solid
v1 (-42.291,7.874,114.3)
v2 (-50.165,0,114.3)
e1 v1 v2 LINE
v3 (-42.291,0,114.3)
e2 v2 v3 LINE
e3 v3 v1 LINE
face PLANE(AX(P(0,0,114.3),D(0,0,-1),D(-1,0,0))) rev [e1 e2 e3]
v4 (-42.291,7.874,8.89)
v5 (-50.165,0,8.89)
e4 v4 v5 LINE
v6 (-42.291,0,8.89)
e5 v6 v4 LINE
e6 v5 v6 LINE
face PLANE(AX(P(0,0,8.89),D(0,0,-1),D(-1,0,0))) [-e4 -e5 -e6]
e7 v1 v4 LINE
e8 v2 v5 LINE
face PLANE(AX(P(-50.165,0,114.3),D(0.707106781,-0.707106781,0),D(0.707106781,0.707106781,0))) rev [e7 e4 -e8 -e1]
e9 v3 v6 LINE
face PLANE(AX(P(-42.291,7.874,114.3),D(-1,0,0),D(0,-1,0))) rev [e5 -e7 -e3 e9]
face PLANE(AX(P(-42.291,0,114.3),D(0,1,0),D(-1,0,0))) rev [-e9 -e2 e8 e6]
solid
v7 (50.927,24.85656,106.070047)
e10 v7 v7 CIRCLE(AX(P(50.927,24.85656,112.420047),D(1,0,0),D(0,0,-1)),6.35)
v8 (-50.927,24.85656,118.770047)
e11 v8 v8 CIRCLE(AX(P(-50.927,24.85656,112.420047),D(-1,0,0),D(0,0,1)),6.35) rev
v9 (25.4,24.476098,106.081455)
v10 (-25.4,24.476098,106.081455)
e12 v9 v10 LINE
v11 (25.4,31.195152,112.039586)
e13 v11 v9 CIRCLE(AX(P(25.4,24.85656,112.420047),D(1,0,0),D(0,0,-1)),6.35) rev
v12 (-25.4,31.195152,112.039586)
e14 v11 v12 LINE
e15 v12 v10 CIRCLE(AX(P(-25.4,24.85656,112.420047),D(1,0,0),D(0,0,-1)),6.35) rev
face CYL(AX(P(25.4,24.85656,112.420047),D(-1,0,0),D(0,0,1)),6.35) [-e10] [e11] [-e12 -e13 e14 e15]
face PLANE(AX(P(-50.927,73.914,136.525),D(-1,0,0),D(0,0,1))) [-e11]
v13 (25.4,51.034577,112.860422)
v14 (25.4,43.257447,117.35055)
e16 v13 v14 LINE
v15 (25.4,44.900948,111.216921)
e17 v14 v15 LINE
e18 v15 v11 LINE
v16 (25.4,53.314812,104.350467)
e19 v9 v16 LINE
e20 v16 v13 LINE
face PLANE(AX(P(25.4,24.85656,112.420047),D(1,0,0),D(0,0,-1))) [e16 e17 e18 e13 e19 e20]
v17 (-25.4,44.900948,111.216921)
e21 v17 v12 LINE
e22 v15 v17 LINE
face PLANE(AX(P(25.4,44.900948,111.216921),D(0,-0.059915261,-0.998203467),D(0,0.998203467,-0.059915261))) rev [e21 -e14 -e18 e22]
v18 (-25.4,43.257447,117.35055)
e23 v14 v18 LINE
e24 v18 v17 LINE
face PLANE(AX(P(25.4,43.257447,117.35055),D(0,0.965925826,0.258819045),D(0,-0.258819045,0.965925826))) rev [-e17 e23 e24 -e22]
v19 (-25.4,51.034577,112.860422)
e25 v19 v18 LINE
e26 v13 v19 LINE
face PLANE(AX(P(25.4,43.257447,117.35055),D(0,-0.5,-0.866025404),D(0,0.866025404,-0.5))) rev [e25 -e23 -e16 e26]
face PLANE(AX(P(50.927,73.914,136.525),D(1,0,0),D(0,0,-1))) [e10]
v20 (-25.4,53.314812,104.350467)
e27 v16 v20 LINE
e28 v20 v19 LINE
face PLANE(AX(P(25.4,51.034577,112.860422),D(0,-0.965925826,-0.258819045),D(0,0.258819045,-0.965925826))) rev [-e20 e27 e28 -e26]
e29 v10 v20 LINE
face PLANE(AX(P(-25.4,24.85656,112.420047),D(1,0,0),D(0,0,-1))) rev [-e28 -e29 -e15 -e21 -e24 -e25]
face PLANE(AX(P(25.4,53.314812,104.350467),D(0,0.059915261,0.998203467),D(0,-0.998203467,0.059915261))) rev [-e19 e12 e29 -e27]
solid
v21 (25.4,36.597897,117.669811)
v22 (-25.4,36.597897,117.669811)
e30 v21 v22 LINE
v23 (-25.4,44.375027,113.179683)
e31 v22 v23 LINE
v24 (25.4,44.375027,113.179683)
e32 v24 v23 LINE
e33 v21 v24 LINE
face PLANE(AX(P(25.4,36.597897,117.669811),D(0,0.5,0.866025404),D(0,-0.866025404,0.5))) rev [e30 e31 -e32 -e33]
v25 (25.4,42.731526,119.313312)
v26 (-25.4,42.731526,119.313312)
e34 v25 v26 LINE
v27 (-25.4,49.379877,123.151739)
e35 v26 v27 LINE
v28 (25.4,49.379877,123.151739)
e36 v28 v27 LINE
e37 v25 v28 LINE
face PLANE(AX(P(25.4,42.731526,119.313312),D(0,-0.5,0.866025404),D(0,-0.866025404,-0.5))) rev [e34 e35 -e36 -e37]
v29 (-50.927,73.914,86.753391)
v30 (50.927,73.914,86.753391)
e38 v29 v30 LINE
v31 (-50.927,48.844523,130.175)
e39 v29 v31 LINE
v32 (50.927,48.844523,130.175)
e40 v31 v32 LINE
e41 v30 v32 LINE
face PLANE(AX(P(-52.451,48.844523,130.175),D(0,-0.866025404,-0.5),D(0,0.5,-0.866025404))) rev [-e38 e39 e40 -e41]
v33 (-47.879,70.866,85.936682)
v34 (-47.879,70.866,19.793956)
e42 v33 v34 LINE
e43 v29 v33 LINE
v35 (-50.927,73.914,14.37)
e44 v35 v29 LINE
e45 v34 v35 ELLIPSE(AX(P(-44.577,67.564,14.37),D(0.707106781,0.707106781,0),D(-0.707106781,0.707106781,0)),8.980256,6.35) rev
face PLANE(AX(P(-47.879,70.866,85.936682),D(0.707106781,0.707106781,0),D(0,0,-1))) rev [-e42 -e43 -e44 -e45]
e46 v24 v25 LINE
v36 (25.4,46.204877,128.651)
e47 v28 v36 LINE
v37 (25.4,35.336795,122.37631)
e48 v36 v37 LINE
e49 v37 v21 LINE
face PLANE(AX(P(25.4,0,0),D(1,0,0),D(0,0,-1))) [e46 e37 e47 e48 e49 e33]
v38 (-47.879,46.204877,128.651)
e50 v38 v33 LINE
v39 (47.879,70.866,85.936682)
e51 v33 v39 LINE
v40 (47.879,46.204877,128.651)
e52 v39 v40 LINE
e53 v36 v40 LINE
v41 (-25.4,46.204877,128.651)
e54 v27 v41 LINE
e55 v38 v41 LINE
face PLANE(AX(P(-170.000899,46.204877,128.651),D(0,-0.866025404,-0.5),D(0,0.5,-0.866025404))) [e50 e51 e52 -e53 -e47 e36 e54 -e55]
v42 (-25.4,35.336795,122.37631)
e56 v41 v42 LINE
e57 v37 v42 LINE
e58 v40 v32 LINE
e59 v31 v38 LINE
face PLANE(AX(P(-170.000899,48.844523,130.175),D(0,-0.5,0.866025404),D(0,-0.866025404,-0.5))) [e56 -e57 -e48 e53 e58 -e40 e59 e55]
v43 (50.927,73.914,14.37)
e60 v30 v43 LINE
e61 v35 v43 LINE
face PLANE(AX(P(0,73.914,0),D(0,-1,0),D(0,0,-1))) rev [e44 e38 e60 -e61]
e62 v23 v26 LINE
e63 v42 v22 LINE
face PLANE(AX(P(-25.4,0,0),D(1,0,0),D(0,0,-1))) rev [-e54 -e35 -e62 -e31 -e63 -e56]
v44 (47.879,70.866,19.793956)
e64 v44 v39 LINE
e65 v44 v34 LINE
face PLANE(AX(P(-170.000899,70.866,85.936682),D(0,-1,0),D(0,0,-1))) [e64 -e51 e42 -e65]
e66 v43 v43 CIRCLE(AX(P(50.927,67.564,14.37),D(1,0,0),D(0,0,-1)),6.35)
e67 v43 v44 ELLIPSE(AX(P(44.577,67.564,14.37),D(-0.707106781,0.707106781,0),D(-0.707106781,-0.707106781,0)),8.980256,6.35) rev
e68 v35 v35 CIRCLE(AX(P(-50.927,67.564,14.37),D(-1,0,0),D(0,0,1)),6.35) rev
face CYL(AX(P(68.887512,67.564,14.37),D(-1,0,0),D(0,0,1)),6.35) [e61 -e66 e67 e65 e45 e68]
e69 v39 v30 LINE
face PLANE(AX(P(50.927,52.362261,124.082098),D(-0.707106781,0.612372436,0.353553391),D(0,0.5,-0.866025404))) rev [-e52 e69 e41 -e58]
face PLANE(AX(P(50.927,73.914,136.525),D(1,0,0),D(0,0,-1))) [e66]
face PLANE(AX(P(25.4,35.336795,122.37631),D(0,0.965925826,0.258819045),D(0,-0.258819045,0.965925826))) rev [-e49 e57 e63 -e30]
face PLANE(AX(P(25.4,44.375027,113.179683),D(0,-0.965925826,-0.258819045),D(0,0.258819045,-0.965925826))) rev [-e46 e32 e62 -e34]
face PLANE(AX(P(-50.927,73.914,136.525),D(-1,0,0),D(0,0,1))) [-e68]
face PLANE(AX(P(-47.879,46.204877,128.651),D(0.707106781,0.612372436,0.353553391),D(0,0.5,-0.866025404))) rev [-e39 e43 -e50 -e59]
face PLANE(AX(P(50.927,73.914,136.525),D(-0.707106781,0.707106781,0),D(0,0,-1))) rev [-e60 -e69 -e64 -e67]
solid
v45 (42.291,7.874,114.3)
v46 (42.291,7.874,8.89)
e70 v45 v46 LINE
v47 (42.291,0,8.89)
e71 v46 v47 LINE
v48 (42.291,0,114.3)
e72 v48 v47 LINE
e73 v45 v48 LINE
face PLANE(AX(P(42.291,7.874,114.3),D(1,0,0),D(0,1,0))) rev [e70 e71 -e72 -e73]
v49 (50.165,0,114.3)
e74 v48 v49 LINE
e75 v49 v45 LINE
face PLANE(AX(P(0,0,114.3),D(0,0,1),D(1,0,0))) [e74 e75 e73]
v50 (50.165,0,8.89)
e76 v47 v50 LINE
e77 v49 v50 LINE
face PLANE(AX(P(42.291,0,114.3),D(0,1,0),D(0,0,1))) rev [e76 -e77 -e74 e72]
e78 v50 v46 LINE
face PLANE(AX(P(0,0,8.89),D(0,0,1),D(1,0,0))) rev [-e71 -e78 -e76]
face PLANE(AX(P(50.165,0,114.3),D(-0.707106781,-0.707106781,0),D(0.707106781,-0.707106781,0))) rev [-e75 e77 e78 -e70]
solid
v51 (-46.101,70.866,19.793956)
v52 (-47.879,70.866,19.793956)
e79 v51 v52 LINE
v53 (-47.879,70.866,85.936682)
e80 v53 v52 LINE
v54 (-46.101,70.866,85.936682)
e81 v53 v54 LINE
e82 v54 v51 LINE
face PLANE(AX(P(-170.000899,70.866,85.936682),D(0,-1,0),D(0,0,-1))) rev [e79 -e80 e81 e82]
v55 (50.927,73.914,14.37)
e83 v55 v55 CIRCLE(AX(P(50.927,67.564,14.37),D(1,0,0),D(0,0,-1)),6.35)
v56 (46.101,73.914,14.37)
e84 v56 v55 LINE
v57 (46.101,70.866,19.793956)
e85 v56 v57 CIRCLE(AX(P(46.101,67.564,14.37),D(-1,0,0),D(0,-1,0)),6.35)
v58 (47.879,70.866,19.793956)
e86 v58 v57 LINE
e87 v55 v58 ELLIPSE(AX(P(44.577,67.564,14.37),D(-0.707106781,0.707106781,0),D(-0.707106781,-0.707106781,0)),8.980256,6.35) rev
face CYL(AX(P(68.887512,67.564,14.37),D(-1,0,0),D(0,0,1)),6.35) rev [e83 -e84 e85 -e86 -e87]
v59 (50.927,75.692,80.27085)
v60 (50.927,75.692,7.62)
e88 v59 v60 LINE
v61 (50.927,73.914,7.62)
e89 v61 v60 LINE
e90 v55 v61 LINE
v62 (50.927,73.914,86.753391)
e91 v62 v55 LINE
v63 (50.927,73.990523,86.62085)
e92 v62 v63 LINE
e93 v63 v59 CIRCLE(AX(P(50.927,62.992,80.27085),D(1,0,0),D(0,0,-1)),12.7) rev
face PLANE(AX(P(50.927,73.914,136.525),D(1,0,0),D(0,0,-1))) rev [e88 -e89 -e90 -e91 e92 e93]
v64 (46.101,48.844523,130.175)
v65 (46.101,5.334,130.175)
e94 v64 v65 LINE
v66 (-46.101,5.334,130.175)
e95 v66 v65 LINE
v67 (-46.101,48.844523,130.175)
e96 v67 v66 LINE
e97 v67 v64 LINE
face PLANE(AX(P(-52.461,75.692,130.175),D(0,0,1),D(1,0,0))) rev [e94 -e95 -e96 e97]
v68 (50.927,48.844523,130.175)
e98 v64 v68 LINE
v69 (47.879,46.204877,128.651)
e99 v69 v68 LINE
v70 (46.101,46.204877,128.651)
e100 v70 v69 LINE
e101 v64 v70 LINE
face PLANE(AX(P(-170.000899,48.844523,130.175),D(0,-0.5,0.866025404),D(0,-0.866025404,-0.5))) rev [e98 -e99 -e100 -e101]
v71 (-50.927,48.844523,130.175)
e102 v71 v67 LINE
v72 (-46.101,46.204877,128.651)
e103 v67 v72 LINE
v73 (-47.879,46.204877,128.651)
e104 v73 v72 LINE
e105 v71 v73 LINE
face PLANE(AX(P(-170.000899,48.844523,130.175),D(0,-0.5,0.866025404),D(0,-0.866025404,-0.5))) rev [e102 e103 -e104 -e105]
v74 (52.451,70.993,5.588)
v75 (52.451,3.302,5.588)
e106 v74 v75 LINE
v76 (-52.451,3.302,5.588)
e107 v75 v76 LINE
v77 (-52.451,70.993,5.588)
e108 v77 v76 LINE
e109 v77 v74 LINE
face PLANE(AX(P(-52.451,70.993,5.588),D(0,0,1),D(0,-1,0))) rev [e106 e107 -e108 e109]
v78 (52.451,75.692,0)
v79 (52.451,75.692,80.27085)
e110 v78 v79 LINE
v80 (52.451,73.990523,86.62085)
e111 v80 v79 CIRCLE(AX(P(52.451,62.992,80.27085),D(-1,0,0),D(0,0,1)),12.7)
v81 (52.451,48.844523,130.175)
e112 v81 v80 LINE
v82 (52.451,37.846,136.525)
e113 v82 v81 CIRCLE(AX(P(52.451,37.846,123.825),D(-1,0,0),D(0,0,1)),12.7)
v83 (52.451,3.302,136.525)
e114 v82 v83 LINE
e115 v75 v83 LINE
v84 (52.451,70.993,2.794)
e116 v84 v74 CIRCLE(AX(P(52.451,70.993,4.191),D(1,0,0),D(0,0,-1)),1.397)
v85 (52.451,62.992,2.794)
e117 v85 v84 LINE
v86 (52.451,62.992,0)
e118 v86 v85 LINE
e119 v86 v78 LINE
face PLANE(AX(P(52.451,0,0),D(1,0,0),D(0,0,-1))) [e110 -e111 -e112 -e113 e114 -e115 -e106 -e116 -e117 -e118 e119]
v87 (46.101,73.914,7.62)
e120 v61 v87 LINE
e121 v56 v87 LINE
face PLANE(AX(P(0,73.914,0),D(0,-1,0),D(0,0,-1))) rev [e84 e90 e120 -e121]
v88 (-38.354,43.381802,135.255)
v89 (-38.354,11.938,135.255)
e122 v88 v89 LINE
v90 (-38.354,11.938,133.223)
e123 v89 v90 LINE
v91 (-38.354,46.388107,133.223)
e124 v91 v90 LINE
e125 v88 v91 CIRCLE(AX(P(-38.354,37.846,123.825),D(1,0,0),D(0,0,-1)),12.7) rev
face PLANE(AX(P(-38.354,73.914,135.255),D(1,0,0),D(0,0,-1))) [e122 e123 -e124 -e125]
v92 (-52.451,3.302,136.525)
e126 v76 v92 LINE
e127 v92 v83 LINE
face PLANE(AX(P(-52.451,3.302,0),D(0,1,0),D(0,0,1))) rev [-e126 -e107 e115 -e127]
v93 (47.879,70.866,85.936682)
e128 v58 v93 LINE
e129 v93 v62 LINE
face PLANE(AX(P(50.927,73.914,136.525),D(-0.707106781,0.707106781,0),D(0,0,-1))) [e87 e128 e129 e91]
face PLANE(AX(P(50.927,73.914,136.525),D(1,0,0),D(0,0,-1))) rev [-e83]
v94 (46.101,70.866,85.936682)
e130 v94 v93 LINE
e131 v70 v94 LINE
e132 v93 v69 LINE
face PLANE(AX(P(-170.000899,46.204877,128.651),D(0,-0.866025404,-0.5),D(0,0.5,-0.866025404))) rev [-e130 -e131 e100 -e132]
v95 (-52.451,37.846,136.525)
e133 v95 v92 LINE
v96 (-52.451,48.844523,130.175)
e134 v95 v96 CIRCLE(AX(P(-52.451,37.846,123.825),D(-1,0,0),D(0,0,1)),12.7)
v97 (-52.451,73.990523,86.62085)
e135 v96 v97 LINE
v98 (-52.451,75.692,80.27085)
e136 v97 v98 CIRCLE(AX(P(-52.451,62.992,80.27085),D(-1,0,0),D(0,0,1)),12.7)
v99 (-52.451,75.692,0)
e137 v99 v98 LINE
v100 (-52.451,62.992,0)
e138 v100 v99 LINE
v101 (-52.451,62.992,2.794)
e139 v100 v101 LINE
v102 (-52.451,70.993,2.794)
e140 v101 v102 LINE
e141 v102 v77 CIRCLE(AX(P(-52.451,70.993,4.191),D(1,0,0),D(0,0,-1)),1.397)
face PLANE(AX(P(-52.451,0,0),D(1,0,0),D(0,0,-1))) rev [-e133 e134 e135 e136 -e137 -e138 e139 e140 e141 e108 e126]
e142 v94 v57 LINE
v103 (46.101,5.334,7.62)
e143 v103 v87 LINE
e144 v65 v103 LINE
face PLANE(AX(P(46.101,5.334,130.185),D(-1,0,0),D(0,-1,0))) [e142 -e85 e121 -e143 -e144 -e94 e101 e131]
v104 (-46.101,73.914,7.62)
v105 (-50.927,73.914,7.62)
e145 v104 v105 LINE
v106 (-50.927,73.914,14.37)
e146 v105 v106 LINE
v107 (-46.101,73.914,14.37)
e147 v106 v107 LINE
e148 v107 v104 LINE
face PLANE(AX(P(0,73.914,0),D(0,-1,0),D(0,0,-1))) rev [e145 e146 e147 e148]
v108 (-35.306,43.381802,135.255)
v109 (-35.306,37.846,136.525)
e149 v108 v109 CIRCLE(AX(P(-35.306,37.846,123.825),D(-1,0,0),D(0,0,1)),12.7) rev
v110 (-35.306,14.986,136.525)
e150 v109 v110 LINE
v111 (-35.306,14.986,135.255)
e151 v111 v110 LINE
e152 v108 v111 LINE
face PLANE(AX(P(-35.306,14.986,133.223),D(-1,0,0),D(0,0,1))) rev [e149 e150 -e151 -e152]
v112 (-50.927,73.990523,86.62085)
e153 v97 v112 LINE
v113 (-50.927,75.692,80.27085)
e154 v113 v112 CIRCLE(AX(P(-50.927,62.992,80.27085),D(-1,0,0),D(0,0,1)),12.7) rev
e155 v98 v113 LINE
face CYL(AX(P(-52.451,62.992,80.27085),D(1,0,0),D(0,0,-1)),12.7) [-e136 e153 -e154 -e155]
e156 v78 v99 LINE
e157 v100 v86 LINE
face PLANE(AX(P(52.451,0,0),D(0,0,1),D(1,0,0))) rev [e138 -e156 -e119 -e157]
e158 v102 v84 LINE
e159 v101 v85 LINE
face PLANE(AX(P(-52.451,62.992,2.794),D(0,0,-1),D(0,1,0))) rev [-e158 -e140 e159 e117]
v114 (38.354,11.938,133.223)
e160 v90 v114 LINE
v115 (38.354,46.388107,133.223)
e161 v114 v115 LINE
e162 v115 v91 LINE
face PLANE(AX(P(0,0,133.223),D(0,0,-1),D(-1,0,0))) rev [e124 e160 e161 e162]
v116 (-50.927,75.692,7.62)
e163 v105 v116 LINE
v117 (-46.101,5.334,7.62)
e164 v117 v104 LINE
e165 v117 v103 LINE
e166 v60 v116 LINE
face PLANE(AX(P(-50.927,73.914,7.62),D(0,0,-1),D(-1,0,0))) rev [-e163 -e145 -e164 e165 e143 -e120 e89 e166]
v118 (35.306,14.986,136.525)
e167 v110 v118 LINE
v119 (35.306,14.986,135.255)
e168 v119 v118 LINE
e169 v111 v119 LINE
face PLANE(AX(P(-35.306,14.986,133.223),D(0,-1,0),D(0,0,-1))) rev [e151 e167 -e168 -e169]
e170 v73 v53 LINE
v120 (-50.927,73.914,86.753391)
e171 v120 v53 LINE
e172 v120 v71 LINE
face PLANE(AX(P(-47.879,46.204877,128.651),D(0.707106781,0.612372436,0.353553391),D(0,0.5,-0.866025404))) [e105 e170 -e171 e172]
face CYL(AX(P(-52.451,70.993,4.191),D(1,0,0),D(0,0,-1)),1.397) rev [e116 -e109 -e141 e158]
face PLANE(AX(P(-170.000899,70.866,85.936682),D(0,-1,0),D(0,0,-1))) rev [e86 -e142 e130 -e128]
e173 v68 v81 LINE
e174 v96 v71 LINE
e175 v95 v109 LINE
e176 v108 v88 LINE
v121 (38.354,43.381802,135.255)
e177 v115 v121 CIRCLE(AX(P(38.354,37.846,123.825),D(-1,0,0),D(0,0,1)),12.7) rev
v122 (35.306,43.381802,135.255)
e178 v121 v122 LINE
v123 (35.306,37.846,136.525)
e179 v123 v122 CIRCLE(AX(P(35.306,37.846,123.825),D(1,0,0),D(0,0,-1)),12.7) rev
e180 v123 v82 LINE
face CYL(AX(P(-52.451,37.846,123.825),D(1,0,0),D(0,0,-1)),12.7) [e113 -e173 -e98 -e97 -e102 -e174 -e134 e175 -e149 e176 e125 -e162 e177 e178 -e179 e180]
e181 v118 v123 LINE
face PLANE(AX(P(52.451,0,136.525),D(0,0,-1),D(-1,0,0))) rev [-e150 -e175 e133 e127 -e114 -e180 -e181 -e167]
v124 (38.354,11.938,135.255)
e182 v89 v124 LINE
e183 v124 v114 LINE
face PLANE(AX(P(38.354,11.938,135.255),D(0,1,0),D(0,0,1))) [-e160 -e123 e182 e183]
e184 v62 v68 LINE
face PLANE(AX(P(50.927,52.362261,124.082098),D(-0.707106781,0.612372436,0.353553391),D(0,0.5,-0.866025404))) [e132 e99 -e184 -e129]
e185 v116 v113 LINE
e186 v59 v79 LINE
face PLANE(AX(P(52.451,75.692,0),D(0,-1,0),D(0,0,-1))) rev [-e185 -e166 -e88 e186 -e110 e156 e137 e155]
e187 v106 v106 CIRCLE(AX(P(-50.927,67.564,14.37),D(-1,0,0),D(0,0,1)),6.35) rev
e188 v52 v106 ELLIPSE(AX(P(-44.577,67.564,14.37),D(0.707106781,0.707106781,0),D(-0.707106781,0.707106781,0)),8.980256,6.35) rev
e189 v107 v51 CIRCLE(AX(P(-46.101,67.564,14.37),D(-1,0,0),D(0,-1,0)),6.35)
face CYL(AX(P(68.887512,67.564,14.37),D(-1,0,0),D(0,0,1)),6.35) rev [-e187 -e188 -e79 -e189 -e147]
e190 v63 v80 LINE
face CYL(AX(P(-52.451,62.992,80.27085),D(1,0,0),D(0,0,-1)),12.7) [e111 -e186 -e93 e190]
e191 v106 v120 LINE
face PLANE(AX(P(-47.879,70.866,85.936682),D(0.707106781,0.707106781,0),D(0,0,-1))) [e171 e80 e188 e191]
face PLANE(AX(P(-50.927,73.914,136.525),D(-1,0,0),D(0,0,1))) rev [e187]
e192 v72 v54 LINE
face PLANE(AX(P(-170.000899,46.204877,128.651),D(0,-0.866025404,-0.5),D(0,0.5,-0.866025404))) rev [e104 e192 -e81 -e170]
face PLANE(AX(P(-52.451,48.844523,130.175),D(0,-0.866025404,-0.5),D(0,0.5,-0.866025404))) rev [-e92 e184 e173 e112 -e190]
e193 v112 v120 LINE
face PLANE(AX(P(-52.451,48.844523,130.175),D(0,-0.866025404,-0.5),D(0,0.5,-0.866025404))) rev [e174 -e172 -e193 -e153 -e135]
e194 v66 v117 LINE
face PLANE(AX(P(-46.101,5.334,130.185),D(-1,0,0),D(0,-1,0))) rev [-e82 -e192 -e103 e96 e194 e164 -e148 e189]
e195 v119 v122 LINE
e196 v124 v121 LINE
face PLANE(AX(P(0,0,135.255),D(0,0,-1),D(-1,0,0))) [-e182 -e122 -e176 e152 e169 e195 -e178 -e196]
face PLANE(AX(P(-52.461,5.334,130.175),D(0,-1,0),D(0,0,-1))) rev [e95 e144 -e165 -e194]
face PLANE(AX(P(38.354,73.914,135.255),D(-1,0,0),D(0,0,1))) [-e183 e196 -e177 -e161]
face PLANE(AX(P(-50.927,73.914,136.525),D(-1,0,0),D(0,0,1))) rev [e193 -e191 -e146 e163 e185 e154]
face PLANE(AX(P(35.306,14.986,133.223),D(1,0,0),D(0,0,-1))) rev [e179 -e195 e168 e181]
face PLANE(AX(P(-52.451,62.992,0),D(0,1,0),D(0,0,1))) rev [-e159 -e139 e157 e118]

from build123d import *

# Parameters (mm, degrees)
SKETCH1_W                       = 136.525
SKETCH1_H                       = 75.692
BOSS_EXTRUDE1_DEPTH             = 52.451
CUT_EXTRUDE1_DEPTH              = 189.076537859
SKETCH3_W                       = 136.525
SKETCH3_H                       = 3.302
CUT_EXTRUDE2_DEPTH              = 189.076537859
BOSS_EXTRUDE2_START             = 8.89
BOSS_EXTRUDE2_DEPTH             = 105.41
BOSS_EXTRUDE2_2_DEPTH           = 105.41
SKETCH5_W                       = 101.854
SKETCH5_H                       = 128.905
CUT_EXTRUDE3_DEPTH              = 1.778
SKETCH6_W                       = 70.612
SKETCH6_H                       = 58.928
CUT_EXTRUDE4_DEPTH              = 3.302
SKETCH7_W                       = 76.708
SKETCH7_H                       = 61.976
CUT_EXTRUDE5_DEPTH              = 2.032
CUT_EXTRUDE6_DEPTH              = 189.076537859
SPLIT1_SURFACE_1_BACK           = 189.077
SPLIT1_SURFACE_1_DEPTH          = 378.154
SPLIT1_SURFACE_2_BACK           = 189.077
SPLIT1_SURFACE_2_DEPTH          = 378.154
BOSS_EXTRUDE3_REACH             = 166.68
SKETCH12_R                      = 6.35
BOSS_EXTRUDE3_DIRECTION_2_REACH = 166.68
BOSS_EXTRUDE4_DEPTH             = 101.854
CHAMFER1_SIZE                   = 3.048
INTERSECT1_START                = -88.312595624
INTERSECT1_DEPTH                = 106.603527134
INTERSECT1_START_2              = 14.369999962
INTERSECT1_2_DEPTH              = 114.281000039
INTERSECT1_START_3              = -50.927
INTERSECT1_3_OUTLINE_R          = 6.35
INTERSECT1_3_DEPTH              = 101.854
SPLIT4_START                    = -46.101
SPLIT4_DEPTH                    = 98.552
SPLIT4_START_2                  = 46.101
SPLIT4_2_DEPTH                  = 6.35
SPLIT4_START_3                  = 47.879
SPLIT4_3_DEPTH                  = 4.572
SPLIT4_START_4                  = 50.927
SPLIT4_4_OUTLINE_R              = 6.35
SPLIT4_4_DEPTH                  = 1.524
SPLIT4_START_5                  = -88.312595624
SPLIT4_5_DEPTH                  = 106.603527134
SPLIT4_START_6                  = 14.369999962
SPLIT4_6_DEPTH                  = 115.805000039
SPLIT4_START_7                  = 7
SPLIT4_7_OUTLINE_W              = 3.048
SPLIT4_7_OUTLINE_H              = 1.778
SPLIT4_7_DEPTH                  = 8.001344832
BOSS_EXTRUDE5_DEPTH             = 25.4
BOSS_EXTRUDE6_DEPTH             = 25.4
BOSS_EXTRUDE7_START             = -50.927
BOSS_EXTRUDE7_OUTLINE_R         = 6.35
BOSS_EXTRUDE7_DEPTH             = 101.854


with BuildPart() as part:
    # Sketch1 → Boss-Extrude1 (new, symmetric)
    with BuildSketch(Plane(origin=(0, 0, 0), x_dir=(0, 0, -1), z_dir=(1, 0, 0))):
        with Locations((-68.2625, 37.846)):
            Rectangle(SKETCH1_W, SKETCH1_H)
    extrude(amount=BOSS_EXTRUDE1_DEPTH, both=True)

    # Sketch2 → Cut-Extrude1 (cut, through all)
    with BuildSketch(Plane(origin=(52.451, 0, 0), x_dir=(0, 0, -1), z_dir=(1, 0, 0))):
        with BuildLine():
            Line((0, 0), (0, 62.992))
            Line((0, 62.992), (-2.794, 62.992))
            Line((-2.794, 62.992), (-2.794, 70.993))
            ThreePointArc((-2.794, 70.993), (-4.191, 72.39), (-5.588, 70.993))
            Line((-5.588, 70.993), (-5.588, 0))
            Line((-5.588, 0), (0, 0))
        make_face()
    extrude(amount=-CUT_EXTRUDE1_DEPTH, mode=Mode.SUBTRACT)

    # Sketch3 → Cut-Extrude2 (cut, through all)
    with BuildSketch(Plane(origin=(52.451, 0, 0), x_dir=(0, 0, -1), z_dir=(1, 0, 0))):
        with Locations((-68.2625, 1.651)):
            Rectangle(SKETCH3_W, SKETCH3_H)
    extrude(amount=-CUT_EXTRUDE2_DEPTH, mode=Mode.SUBTRACT)

    # Sketch5 → Cut-Extrude3 (cut)
    with BuildSketch(Plane(origin=(0, 75.692, 0), x_dir=(1, 0, 0), z_dir=(0, 1, 0))):
        with Locations((0, -72.0725)):
            Rectangle(SKETCH5_W, SKETCH5_H)
    extrude(amount=-CUT_EXTRUDE3_DEPTH, mode=Mode.SUBTRACT)

    # Sketch6 → Cut-Extrude4 (cut)
    with BuildSketch(Plane.XY.offset(136.525)):
        with Locations((0, 44.45)):
            Rectangle(SKETCH6_W, SKETCH6_H)
    extrude(amount=-CUT_EXTRUDE4_DEPTH, mode=Mode.SUBTRACT)

    # Sketch7 → Cut-Extrude5 (cut)
    with BuildSketch(Plane.XY.offset(133.223)):
        with Locations((0, 42.926)):
            Rectangle(SKETCH7_W, SKETCH7_H)
    extrude(amount=CUT_EXTRUDE5_DEPTH, mode=Mode.SUBTRACT)

    # Sketch8 → Cut-Extrude6 (cut, through all)
    with BuildSketch(Plane(origin=(52.451, 0, 0), x_dir=(0, 0, -1), z_dir=(1, 0, 0))):
        with BuildLine():
            Line((-136.525, 75.692), (-136.525, 37.846))
            ThreePointArc((-136.525, 37.846), (-134.823522628, 44.196), (-130.175, 48.844522628))
            Line((-130.175, 48.844522628), (-86.620850393, 73.990522628))
            ThreePointArc((-86.620850393, 73.990522628), (-83.557852266, 75.259257994), (-80.270850393, 75.692))
            Line((-80.270850393, 75.692), (-136.525, 75.692))
        make_face()
    extrude(amount=-CUT_EXTRUDE6_DEPTH, mode=Mode.SUBTRACT)


with BuildPart() as body_2:
    # Sketch4 → Boss-Extrude2 (new body)
    with BuildSketch(Plane.XY.offset(BOSS_EXTRUDE2_START)):
        Polygon((42.291, 7.874), (42.291, 0), (50.165, 0), align=None)
    extrude(amount=BOSS_EXTRUDE2_DEPTH)


with BuildPart() as body_3:
    # Sketch4 → Boss-Extrude2 2 (new body)
    with BuildSketch(Plane.XY.offset(BOSS_EXTRUDE2_START)):
        Polygon((-42.291, 7.874), (-42.291, 0), (-50.165, 0), align=None)
    extrude(amount=BOSS_EXTRUDE2_2_DEPTH)


with BuildPart() as body_4:
    # Split1: the piece behind the surface
    add(part.part)
    # Split1 surface: a surface, the sketch's curves swept straight by 378.154 mm
    with BuildLine(Plane(origin=(52.451, 0, 0), x_dir=(0, 0, -1), z_dir=(1, 0, 0)).offset(-SPLIT1_SURFACE_1_BACK), mode=Mode.PRIVATE) as split1_surface_1_path:
        Line((-130.175, 75.692), (-7.62, 75.692))
        Line((-7.62, 75.692), (-7.62, 5.334))
        Line((-7.62, 5.334), (-130.175, 5.334))
        Line((-130.175, 5.334), (-130.175, 75.692))
    split1_surface_1 = Shell.extrude(split1_surface_1_path.wire(), (1 * SPLIT1_SURFACE_1_DEPTH, 0 * SPLIT1_SURFACE_1_DEPTH, 0 * SPLIT1_SURFACE_1_DEPTH))
    split(bisect_by=split1_surface_1, keep=Keep.BOTTOM)


with BuildPart() as part_1:
    add(part.part)

    # Split1: split by a surface, the side it looks to stays
    # Split1 surface: a surface, the sketch's curves swept straight by 378.154 mm
    with BuildLine(Plane(origin=(52.451, 0, 0), x_dir=(0, 0, -1), z_dir=(1, 0, 0)).offset(-SPLIT1_SURFACE_2_BACK), mode=Mode.PRIVATE) as split1_surface_2_path:
        Line((-130.175, 75.692), (-7.62, 75.692))
        Line((-7.62, 75.692), (-7.62, 5.334))
        Line((-7.62, 5.334), (-130.175, 5.334))
        Line((-130.175, 5.334), (-130.175, 75.692))
    split1_surface_2 = Shell.extrude(split1_surface_2_path.wire(), (1 * SPLIT1_SURFACE_2_DEPTH, 0 * SPLIT1_SURFACE_2_DEPTH, 0 * SPLIT1_SURFACE_2_DEPTH))
    split(bisect_by=split1_surface_2, keep=Keep.TOP)


with BuildPart() as body_5:

    # Boss-Extrude3: up to this face of the body (flat: up to its plane)
    boss_extrude3_end = Plane(body_4.part.faces().sort_by_distance((50.927, 74.793132551, 46.152790149))[0])
    # Sketch12 → Boss-Extrude3 (new, up to the picked face)
    with BuildSketch(Plane(origin=(0, 0, 0), x_dir=(0, 0, -1), z_dir=(1, 0, 0)), mode=Mode.PRIVATE) as boss_extrude3_sk1:
        with Locations(Location((-14.369999962, 67.564, 0), (0, 0, 180))):
            Circle(SKETCH12_R)
    boss_extrude3_tool1 = split(extrude(boss_extrude3_sk1.sketch, amount=BOSS_EXTRUDE3_REACH, mode=Mode.PRIVATE), bisect_by=boss_extrude3_end, keep=Keep.BOTH, mode=Mode.PRIVATE)
    add(boss_extrude3_tool1.solids().sort_by(Axis((0, 67.564, 14.37), (1, 0, 0)))[0])


    # Boss-Extrude3 direction 2: up to this face of the body (flat: up to its plane)
    boss_extrude3_direction_2_end = Plane(body_4.part.faces().sort_by_distance((-50.927, 74.793132551, 46.152790149))[0])
    # Sketch12 → Boss-Extrude3 direction 2 (add, up to the picked face)
    with BuildSketch(Plane(origin=(0, 0, 0), x_dir=(0, 0, -1), z_dir=(1, 0, 0)), mode=Mode.PRIVATE) as boss_extrude3_direction_2_sk1:
        with Locations(Location((-14.369999962, 67.564, 0), (0, 0, 180))):
            Circle(SKETCH12_R)
    boss_extrude3_direction_2_tool1 = split(extrude(boss_extrude3_direction_2_sk1.sketch, amount=-BOSS_EXTRUDE3_DIRECTION_2_REACH, mode=Mode.PRIVATE), bisect_by=boss_extrude3_direction_2_end, keep=Keep.BOTH, mode=Mode.PRIVATE)
    add(boss_extrude3_direction_2_tool1.solids().sort_by(Axis((0, 67.564, 14.37), (-1, 0, 0)))[0])

    # Sketch13 → Boss-Extrude4 (add)
    with BuildSketch(Plane(origin=(50.927, 0, 0), x_dir=(0, 0, -1), z_dir=(1, 0, 0))):
        Polygon((-14.369999962, 73.914), (-86.753391473, 73.914), (-130.175, 48.844522628), (-128.651, 46.204877197), (-85.936682334, 70.866), (-14.369999962, 70.866), align=None)
    extrude(amount=-BOSS_EXTRUDE4_DEPTH)

    # Chamfer1
    chamfer1_edges = [body_5.edges().sort_by_distance(p)[0] for p in [
        (-50.927, 58.535438599, 107.293841167),
        (-50.927, 70.866, 52.865319024),
        (50.927, 58.535438599, 107.293841167),
        (50.927, 70.866, 52.865319024),
    ]]
    chamfer(chamfer1_edges, length=CHAMFER1_SIZE - 0.0001)  # a hair under: the kernel refuses the full size

    # Sketch15 → Boss-Extrude5 (add, symmetric)
    with BuildSketch(Plane(origin=(0, 0, 0), x_dir=(0, 0, -1), z_dir=(1, 0, 0))):
        Polygon((-128.651, 46.204877197), (-122.37630963, 35.336794674), (-117.669810566, 36.597897298), (-113.179682506, 44.375027231), (-119.313311503, 42.731526294), (-123.151738686, 49.379877197), align=None)
    extrude(amount=BOSS_EXTRUDE5_DEPTH, both=True)


with BuildPart() as body_4_1:
    add(body_4.part)

    # Intersect1: read off the stored shape, not the designer's step
    # Intersect1 outline → Intersect1 (cut)
    with BuildSketch(Plane(origin=(0, 0, 0), x_dir=(1, 0, 0), z_dir=(0, 0.49999999999998085, -0.8660254037844498)).offset(INTERSECT1_START)):
        Polygon((-47.879, -104.340097432), (-50.927, -107.388097432), (50.927, -107.388097432), (47.879, -104.340097432), align=None)
    extrude(amount=INTERSECT1_DEPTH, mode=Mode.SUBTRACT)

    # Intersect1 2 outline → Intersect1 2 (cut)
    with BuildSketch(Plane.XY.offset(INTERSECT1_START_2)):
        Polygon((47.879, 70.866), (50.927, 73.914), (-50.927, 73.914), (-47.879, 70.866), align=None)
    extrude(amount=INTERSECT1_2_DEPTH, mode=Mode.SUBTRACT)

    # Intersect1 3 outline → Intersect1 3 (cut)
    with BuildSketch(Plane.YZ.offset(INTERSECT1_START_3)):
        with Locations((67.564, 14.369999962)):
            Circle(INTERSECT1_3_OUTLINE_R)
    extrude(amount=INTERSECT1_3_DEPTH, mode=Mode.SUBTRACT)

    # Split4: read off the stored shape, not the designer's step
    # Split4 outline → Split4 (cut)
    with BuildSketch(Plane.YZ.offset(SPLIT4_START)):
        with BuildLine():
            Line((5.334, 7.62), (75.692, 7.62))
            Line((75.692, 7.62), (75.692, 80.270850393))
            ThreePointArc((75.692, 80.270850393), (75.259257994, 83.557852266), (73.990522628, 86.620850393))
            Line((73.990522628, 86.620850393), (48.844522628, 130.175))
            Line((48.844522628, 130.175), (5.334, 130.175))
            Line((5.334, 130.175), (5.334, 7.62))
        make_face()
    extrude(amount=SPLIT4_DEPTH, mode=Mode.SUBTRACT)


with BuildPart() as body_6:
    # Split4 2 outline → Split4 2 (new body)
    with BuildSketch(Plane.YZ.offset(SPLIT4_START_2)):
        with BuildLine():
            Line((73.914, 7.62), (73.914, 14.369999962))
            ThreePointArc((73.914, 14.369999962), (62.028198342, 11.259147989), (70.866, 19.793955714))
            Line((70.866, 19.793955714), (70.866, 85.936682334))
            Line((70.866, 85.936682334), (46.204877197, 128.651))
            Line((46.204877197, 128.651), (48.844522628, 130.175))
            Line((48.844522628, 130.175), (5.334, 130.175))
            Line((5.334, 130.175), (5.334, 7.62))
            Line((5.334, 7.62), (73.914, 7.62))
        make_face()
    extrude(amount=SPLIT4_2_DEPTH)

    # Split4 3 outline → Split4 3 (add)
    with BuildSketch(Plane.YZ.offset(SPLIT4_START_3)):
        with BuildLine():
            ThreePointArc((70.866, 19.793955714), (73.099801658, 17.480851935), (73.914, 14.369999962))
            Line((73.914, 14.369999962), (73.914, 7.62))
            Line((73.914, 7.62), (75.692, 7.62))
            Line((75.692, 7.62), (75.692, 80.270850393))
            ThreePointArc((75.692, 80.270850393), (75.259257994, 83.557852266), (73.990522628, 86.620850393))
            Line((73.990522628, 86.620850393), (48.844522628, 130.175))
            Line((48.844522628, 130.175), (46.204877197, 128.651))
            Line((46.204877197, 128.651), (70.866, 85.936682334))
            Line((70.866, 85.936682334), (70.866, 19.793955714))
        make_face()
    extrude(amount=SPLIT4_3_DEPTH)

    # Split4 4 outline → Split4 4 (add)
    with BuildSketch(Plane.YZ.offset(SPLIT4_START_4)):
        with Locations((67.564, 14.369999962)):
            Circle(SPLIT4_4_OUTLINE_R)
    extrude(amount=SPLIT4_4_DEPTH)

    # Split4 5 outline → Split4 5 (cut)
    with BuildSketch(Plane(origin=(0, 0, 0), x_dir=(1, 0, 0), z_dir=(0, 0.49999999999998085, -0.8660254037844498)).offset(SPLIT4_START_5)):
        Polygon((50.927, -107.388097432), (47.879, -104.340097432), (47.879, -107.388097432), align=None)
    extrude(amount=SPLIT4_5_DEPTH, mode=Mode.SUBTRACT)

    # Split4 6 outline → Split4 6 (cut)
    with BuildSketch(Plane.XY.offset(SPLIT4_START_6)):
        Polygon((47.879, 75.692), (47.879, 70.866), (50.927, 73.914), (50.927, 75.692), align=None)
    extrude(amount=SPLIT4_6_DEPTH, mode=Mode.SUBTRACT)

    # Split4 7 outline → Split4 7 (cut)
    with BuildSketch(Plane.XY.offset(SPLIT4_START_7)):
        with Locations((49.403, 74.803)):
            Rectangle(SPLIT4_7_OUTLINE_W, SPLIT4_7_OUTLINE_H)
    extrude(amount=SPLIT4_7_DEPTH, mode=Mode.SUBTRACT)


with BuildPart() as part_2:
    add(part_1.part)

    # Combine1: read off the stored shape, not the designer's step
    # Combine1: union body 4, body 6
    add(body_4_1.part)
    add(body_6.part)


with BuildPart() as body_5_2:
    # Sketch16 → Boss-Extrude6 (new, symmetric)
    with BuildSketch(Plane(origin=(0, 0, 0), x_dir=(0, 0, -1), z_dir=(1, 0, 0))):
        with BuildLine():
            Line((-117.350550224, 43.257446594), (-111.216921227, 44.900947531))
            Line((-111.216921227, 44.900947531), (-112.039585508, 31.195151619))
            ThreePointArc((-112.039585508, 31.195151619), (-117.171136006, 20.6435254), (-106.081455399, 24.476097697))
            Line((-106.081455399, 24.476097697), (-104.350466513, 53.314812271))
            Line((-104.350466513, 53.314812271), (-112.860422163, 51.034576527))
            Line((-112.860422163, 51.034576527), (-117.350550224, 43.257446594))
        make_face()
    extrude(amount=BOSS_EXTRUDE6_DEPTH, both=True)

    # Boss-Extrude7: read off the stored shape, not the designer's step
    # Boss-Extrude7 outline → Boss-Extrude7 (add)
    with BuildSketch(Plane(origin=(0, 0, 0), x_dir=(0, 0, -1), z_dir=(1, 0, 0)).offset(BOSS_EXTRUDE7_START)):
        with Locations((-112.420047414, 24.856559603)):
            Circle(BOSS_EXTRUDE7_OUTLINE_R)
    extrude(amount=BOSS_EXTRUDE7_DEPTH)


solid = Compound([body_2.part, body_3.part, body_5.part, part_2.part, body_5_2.part])
